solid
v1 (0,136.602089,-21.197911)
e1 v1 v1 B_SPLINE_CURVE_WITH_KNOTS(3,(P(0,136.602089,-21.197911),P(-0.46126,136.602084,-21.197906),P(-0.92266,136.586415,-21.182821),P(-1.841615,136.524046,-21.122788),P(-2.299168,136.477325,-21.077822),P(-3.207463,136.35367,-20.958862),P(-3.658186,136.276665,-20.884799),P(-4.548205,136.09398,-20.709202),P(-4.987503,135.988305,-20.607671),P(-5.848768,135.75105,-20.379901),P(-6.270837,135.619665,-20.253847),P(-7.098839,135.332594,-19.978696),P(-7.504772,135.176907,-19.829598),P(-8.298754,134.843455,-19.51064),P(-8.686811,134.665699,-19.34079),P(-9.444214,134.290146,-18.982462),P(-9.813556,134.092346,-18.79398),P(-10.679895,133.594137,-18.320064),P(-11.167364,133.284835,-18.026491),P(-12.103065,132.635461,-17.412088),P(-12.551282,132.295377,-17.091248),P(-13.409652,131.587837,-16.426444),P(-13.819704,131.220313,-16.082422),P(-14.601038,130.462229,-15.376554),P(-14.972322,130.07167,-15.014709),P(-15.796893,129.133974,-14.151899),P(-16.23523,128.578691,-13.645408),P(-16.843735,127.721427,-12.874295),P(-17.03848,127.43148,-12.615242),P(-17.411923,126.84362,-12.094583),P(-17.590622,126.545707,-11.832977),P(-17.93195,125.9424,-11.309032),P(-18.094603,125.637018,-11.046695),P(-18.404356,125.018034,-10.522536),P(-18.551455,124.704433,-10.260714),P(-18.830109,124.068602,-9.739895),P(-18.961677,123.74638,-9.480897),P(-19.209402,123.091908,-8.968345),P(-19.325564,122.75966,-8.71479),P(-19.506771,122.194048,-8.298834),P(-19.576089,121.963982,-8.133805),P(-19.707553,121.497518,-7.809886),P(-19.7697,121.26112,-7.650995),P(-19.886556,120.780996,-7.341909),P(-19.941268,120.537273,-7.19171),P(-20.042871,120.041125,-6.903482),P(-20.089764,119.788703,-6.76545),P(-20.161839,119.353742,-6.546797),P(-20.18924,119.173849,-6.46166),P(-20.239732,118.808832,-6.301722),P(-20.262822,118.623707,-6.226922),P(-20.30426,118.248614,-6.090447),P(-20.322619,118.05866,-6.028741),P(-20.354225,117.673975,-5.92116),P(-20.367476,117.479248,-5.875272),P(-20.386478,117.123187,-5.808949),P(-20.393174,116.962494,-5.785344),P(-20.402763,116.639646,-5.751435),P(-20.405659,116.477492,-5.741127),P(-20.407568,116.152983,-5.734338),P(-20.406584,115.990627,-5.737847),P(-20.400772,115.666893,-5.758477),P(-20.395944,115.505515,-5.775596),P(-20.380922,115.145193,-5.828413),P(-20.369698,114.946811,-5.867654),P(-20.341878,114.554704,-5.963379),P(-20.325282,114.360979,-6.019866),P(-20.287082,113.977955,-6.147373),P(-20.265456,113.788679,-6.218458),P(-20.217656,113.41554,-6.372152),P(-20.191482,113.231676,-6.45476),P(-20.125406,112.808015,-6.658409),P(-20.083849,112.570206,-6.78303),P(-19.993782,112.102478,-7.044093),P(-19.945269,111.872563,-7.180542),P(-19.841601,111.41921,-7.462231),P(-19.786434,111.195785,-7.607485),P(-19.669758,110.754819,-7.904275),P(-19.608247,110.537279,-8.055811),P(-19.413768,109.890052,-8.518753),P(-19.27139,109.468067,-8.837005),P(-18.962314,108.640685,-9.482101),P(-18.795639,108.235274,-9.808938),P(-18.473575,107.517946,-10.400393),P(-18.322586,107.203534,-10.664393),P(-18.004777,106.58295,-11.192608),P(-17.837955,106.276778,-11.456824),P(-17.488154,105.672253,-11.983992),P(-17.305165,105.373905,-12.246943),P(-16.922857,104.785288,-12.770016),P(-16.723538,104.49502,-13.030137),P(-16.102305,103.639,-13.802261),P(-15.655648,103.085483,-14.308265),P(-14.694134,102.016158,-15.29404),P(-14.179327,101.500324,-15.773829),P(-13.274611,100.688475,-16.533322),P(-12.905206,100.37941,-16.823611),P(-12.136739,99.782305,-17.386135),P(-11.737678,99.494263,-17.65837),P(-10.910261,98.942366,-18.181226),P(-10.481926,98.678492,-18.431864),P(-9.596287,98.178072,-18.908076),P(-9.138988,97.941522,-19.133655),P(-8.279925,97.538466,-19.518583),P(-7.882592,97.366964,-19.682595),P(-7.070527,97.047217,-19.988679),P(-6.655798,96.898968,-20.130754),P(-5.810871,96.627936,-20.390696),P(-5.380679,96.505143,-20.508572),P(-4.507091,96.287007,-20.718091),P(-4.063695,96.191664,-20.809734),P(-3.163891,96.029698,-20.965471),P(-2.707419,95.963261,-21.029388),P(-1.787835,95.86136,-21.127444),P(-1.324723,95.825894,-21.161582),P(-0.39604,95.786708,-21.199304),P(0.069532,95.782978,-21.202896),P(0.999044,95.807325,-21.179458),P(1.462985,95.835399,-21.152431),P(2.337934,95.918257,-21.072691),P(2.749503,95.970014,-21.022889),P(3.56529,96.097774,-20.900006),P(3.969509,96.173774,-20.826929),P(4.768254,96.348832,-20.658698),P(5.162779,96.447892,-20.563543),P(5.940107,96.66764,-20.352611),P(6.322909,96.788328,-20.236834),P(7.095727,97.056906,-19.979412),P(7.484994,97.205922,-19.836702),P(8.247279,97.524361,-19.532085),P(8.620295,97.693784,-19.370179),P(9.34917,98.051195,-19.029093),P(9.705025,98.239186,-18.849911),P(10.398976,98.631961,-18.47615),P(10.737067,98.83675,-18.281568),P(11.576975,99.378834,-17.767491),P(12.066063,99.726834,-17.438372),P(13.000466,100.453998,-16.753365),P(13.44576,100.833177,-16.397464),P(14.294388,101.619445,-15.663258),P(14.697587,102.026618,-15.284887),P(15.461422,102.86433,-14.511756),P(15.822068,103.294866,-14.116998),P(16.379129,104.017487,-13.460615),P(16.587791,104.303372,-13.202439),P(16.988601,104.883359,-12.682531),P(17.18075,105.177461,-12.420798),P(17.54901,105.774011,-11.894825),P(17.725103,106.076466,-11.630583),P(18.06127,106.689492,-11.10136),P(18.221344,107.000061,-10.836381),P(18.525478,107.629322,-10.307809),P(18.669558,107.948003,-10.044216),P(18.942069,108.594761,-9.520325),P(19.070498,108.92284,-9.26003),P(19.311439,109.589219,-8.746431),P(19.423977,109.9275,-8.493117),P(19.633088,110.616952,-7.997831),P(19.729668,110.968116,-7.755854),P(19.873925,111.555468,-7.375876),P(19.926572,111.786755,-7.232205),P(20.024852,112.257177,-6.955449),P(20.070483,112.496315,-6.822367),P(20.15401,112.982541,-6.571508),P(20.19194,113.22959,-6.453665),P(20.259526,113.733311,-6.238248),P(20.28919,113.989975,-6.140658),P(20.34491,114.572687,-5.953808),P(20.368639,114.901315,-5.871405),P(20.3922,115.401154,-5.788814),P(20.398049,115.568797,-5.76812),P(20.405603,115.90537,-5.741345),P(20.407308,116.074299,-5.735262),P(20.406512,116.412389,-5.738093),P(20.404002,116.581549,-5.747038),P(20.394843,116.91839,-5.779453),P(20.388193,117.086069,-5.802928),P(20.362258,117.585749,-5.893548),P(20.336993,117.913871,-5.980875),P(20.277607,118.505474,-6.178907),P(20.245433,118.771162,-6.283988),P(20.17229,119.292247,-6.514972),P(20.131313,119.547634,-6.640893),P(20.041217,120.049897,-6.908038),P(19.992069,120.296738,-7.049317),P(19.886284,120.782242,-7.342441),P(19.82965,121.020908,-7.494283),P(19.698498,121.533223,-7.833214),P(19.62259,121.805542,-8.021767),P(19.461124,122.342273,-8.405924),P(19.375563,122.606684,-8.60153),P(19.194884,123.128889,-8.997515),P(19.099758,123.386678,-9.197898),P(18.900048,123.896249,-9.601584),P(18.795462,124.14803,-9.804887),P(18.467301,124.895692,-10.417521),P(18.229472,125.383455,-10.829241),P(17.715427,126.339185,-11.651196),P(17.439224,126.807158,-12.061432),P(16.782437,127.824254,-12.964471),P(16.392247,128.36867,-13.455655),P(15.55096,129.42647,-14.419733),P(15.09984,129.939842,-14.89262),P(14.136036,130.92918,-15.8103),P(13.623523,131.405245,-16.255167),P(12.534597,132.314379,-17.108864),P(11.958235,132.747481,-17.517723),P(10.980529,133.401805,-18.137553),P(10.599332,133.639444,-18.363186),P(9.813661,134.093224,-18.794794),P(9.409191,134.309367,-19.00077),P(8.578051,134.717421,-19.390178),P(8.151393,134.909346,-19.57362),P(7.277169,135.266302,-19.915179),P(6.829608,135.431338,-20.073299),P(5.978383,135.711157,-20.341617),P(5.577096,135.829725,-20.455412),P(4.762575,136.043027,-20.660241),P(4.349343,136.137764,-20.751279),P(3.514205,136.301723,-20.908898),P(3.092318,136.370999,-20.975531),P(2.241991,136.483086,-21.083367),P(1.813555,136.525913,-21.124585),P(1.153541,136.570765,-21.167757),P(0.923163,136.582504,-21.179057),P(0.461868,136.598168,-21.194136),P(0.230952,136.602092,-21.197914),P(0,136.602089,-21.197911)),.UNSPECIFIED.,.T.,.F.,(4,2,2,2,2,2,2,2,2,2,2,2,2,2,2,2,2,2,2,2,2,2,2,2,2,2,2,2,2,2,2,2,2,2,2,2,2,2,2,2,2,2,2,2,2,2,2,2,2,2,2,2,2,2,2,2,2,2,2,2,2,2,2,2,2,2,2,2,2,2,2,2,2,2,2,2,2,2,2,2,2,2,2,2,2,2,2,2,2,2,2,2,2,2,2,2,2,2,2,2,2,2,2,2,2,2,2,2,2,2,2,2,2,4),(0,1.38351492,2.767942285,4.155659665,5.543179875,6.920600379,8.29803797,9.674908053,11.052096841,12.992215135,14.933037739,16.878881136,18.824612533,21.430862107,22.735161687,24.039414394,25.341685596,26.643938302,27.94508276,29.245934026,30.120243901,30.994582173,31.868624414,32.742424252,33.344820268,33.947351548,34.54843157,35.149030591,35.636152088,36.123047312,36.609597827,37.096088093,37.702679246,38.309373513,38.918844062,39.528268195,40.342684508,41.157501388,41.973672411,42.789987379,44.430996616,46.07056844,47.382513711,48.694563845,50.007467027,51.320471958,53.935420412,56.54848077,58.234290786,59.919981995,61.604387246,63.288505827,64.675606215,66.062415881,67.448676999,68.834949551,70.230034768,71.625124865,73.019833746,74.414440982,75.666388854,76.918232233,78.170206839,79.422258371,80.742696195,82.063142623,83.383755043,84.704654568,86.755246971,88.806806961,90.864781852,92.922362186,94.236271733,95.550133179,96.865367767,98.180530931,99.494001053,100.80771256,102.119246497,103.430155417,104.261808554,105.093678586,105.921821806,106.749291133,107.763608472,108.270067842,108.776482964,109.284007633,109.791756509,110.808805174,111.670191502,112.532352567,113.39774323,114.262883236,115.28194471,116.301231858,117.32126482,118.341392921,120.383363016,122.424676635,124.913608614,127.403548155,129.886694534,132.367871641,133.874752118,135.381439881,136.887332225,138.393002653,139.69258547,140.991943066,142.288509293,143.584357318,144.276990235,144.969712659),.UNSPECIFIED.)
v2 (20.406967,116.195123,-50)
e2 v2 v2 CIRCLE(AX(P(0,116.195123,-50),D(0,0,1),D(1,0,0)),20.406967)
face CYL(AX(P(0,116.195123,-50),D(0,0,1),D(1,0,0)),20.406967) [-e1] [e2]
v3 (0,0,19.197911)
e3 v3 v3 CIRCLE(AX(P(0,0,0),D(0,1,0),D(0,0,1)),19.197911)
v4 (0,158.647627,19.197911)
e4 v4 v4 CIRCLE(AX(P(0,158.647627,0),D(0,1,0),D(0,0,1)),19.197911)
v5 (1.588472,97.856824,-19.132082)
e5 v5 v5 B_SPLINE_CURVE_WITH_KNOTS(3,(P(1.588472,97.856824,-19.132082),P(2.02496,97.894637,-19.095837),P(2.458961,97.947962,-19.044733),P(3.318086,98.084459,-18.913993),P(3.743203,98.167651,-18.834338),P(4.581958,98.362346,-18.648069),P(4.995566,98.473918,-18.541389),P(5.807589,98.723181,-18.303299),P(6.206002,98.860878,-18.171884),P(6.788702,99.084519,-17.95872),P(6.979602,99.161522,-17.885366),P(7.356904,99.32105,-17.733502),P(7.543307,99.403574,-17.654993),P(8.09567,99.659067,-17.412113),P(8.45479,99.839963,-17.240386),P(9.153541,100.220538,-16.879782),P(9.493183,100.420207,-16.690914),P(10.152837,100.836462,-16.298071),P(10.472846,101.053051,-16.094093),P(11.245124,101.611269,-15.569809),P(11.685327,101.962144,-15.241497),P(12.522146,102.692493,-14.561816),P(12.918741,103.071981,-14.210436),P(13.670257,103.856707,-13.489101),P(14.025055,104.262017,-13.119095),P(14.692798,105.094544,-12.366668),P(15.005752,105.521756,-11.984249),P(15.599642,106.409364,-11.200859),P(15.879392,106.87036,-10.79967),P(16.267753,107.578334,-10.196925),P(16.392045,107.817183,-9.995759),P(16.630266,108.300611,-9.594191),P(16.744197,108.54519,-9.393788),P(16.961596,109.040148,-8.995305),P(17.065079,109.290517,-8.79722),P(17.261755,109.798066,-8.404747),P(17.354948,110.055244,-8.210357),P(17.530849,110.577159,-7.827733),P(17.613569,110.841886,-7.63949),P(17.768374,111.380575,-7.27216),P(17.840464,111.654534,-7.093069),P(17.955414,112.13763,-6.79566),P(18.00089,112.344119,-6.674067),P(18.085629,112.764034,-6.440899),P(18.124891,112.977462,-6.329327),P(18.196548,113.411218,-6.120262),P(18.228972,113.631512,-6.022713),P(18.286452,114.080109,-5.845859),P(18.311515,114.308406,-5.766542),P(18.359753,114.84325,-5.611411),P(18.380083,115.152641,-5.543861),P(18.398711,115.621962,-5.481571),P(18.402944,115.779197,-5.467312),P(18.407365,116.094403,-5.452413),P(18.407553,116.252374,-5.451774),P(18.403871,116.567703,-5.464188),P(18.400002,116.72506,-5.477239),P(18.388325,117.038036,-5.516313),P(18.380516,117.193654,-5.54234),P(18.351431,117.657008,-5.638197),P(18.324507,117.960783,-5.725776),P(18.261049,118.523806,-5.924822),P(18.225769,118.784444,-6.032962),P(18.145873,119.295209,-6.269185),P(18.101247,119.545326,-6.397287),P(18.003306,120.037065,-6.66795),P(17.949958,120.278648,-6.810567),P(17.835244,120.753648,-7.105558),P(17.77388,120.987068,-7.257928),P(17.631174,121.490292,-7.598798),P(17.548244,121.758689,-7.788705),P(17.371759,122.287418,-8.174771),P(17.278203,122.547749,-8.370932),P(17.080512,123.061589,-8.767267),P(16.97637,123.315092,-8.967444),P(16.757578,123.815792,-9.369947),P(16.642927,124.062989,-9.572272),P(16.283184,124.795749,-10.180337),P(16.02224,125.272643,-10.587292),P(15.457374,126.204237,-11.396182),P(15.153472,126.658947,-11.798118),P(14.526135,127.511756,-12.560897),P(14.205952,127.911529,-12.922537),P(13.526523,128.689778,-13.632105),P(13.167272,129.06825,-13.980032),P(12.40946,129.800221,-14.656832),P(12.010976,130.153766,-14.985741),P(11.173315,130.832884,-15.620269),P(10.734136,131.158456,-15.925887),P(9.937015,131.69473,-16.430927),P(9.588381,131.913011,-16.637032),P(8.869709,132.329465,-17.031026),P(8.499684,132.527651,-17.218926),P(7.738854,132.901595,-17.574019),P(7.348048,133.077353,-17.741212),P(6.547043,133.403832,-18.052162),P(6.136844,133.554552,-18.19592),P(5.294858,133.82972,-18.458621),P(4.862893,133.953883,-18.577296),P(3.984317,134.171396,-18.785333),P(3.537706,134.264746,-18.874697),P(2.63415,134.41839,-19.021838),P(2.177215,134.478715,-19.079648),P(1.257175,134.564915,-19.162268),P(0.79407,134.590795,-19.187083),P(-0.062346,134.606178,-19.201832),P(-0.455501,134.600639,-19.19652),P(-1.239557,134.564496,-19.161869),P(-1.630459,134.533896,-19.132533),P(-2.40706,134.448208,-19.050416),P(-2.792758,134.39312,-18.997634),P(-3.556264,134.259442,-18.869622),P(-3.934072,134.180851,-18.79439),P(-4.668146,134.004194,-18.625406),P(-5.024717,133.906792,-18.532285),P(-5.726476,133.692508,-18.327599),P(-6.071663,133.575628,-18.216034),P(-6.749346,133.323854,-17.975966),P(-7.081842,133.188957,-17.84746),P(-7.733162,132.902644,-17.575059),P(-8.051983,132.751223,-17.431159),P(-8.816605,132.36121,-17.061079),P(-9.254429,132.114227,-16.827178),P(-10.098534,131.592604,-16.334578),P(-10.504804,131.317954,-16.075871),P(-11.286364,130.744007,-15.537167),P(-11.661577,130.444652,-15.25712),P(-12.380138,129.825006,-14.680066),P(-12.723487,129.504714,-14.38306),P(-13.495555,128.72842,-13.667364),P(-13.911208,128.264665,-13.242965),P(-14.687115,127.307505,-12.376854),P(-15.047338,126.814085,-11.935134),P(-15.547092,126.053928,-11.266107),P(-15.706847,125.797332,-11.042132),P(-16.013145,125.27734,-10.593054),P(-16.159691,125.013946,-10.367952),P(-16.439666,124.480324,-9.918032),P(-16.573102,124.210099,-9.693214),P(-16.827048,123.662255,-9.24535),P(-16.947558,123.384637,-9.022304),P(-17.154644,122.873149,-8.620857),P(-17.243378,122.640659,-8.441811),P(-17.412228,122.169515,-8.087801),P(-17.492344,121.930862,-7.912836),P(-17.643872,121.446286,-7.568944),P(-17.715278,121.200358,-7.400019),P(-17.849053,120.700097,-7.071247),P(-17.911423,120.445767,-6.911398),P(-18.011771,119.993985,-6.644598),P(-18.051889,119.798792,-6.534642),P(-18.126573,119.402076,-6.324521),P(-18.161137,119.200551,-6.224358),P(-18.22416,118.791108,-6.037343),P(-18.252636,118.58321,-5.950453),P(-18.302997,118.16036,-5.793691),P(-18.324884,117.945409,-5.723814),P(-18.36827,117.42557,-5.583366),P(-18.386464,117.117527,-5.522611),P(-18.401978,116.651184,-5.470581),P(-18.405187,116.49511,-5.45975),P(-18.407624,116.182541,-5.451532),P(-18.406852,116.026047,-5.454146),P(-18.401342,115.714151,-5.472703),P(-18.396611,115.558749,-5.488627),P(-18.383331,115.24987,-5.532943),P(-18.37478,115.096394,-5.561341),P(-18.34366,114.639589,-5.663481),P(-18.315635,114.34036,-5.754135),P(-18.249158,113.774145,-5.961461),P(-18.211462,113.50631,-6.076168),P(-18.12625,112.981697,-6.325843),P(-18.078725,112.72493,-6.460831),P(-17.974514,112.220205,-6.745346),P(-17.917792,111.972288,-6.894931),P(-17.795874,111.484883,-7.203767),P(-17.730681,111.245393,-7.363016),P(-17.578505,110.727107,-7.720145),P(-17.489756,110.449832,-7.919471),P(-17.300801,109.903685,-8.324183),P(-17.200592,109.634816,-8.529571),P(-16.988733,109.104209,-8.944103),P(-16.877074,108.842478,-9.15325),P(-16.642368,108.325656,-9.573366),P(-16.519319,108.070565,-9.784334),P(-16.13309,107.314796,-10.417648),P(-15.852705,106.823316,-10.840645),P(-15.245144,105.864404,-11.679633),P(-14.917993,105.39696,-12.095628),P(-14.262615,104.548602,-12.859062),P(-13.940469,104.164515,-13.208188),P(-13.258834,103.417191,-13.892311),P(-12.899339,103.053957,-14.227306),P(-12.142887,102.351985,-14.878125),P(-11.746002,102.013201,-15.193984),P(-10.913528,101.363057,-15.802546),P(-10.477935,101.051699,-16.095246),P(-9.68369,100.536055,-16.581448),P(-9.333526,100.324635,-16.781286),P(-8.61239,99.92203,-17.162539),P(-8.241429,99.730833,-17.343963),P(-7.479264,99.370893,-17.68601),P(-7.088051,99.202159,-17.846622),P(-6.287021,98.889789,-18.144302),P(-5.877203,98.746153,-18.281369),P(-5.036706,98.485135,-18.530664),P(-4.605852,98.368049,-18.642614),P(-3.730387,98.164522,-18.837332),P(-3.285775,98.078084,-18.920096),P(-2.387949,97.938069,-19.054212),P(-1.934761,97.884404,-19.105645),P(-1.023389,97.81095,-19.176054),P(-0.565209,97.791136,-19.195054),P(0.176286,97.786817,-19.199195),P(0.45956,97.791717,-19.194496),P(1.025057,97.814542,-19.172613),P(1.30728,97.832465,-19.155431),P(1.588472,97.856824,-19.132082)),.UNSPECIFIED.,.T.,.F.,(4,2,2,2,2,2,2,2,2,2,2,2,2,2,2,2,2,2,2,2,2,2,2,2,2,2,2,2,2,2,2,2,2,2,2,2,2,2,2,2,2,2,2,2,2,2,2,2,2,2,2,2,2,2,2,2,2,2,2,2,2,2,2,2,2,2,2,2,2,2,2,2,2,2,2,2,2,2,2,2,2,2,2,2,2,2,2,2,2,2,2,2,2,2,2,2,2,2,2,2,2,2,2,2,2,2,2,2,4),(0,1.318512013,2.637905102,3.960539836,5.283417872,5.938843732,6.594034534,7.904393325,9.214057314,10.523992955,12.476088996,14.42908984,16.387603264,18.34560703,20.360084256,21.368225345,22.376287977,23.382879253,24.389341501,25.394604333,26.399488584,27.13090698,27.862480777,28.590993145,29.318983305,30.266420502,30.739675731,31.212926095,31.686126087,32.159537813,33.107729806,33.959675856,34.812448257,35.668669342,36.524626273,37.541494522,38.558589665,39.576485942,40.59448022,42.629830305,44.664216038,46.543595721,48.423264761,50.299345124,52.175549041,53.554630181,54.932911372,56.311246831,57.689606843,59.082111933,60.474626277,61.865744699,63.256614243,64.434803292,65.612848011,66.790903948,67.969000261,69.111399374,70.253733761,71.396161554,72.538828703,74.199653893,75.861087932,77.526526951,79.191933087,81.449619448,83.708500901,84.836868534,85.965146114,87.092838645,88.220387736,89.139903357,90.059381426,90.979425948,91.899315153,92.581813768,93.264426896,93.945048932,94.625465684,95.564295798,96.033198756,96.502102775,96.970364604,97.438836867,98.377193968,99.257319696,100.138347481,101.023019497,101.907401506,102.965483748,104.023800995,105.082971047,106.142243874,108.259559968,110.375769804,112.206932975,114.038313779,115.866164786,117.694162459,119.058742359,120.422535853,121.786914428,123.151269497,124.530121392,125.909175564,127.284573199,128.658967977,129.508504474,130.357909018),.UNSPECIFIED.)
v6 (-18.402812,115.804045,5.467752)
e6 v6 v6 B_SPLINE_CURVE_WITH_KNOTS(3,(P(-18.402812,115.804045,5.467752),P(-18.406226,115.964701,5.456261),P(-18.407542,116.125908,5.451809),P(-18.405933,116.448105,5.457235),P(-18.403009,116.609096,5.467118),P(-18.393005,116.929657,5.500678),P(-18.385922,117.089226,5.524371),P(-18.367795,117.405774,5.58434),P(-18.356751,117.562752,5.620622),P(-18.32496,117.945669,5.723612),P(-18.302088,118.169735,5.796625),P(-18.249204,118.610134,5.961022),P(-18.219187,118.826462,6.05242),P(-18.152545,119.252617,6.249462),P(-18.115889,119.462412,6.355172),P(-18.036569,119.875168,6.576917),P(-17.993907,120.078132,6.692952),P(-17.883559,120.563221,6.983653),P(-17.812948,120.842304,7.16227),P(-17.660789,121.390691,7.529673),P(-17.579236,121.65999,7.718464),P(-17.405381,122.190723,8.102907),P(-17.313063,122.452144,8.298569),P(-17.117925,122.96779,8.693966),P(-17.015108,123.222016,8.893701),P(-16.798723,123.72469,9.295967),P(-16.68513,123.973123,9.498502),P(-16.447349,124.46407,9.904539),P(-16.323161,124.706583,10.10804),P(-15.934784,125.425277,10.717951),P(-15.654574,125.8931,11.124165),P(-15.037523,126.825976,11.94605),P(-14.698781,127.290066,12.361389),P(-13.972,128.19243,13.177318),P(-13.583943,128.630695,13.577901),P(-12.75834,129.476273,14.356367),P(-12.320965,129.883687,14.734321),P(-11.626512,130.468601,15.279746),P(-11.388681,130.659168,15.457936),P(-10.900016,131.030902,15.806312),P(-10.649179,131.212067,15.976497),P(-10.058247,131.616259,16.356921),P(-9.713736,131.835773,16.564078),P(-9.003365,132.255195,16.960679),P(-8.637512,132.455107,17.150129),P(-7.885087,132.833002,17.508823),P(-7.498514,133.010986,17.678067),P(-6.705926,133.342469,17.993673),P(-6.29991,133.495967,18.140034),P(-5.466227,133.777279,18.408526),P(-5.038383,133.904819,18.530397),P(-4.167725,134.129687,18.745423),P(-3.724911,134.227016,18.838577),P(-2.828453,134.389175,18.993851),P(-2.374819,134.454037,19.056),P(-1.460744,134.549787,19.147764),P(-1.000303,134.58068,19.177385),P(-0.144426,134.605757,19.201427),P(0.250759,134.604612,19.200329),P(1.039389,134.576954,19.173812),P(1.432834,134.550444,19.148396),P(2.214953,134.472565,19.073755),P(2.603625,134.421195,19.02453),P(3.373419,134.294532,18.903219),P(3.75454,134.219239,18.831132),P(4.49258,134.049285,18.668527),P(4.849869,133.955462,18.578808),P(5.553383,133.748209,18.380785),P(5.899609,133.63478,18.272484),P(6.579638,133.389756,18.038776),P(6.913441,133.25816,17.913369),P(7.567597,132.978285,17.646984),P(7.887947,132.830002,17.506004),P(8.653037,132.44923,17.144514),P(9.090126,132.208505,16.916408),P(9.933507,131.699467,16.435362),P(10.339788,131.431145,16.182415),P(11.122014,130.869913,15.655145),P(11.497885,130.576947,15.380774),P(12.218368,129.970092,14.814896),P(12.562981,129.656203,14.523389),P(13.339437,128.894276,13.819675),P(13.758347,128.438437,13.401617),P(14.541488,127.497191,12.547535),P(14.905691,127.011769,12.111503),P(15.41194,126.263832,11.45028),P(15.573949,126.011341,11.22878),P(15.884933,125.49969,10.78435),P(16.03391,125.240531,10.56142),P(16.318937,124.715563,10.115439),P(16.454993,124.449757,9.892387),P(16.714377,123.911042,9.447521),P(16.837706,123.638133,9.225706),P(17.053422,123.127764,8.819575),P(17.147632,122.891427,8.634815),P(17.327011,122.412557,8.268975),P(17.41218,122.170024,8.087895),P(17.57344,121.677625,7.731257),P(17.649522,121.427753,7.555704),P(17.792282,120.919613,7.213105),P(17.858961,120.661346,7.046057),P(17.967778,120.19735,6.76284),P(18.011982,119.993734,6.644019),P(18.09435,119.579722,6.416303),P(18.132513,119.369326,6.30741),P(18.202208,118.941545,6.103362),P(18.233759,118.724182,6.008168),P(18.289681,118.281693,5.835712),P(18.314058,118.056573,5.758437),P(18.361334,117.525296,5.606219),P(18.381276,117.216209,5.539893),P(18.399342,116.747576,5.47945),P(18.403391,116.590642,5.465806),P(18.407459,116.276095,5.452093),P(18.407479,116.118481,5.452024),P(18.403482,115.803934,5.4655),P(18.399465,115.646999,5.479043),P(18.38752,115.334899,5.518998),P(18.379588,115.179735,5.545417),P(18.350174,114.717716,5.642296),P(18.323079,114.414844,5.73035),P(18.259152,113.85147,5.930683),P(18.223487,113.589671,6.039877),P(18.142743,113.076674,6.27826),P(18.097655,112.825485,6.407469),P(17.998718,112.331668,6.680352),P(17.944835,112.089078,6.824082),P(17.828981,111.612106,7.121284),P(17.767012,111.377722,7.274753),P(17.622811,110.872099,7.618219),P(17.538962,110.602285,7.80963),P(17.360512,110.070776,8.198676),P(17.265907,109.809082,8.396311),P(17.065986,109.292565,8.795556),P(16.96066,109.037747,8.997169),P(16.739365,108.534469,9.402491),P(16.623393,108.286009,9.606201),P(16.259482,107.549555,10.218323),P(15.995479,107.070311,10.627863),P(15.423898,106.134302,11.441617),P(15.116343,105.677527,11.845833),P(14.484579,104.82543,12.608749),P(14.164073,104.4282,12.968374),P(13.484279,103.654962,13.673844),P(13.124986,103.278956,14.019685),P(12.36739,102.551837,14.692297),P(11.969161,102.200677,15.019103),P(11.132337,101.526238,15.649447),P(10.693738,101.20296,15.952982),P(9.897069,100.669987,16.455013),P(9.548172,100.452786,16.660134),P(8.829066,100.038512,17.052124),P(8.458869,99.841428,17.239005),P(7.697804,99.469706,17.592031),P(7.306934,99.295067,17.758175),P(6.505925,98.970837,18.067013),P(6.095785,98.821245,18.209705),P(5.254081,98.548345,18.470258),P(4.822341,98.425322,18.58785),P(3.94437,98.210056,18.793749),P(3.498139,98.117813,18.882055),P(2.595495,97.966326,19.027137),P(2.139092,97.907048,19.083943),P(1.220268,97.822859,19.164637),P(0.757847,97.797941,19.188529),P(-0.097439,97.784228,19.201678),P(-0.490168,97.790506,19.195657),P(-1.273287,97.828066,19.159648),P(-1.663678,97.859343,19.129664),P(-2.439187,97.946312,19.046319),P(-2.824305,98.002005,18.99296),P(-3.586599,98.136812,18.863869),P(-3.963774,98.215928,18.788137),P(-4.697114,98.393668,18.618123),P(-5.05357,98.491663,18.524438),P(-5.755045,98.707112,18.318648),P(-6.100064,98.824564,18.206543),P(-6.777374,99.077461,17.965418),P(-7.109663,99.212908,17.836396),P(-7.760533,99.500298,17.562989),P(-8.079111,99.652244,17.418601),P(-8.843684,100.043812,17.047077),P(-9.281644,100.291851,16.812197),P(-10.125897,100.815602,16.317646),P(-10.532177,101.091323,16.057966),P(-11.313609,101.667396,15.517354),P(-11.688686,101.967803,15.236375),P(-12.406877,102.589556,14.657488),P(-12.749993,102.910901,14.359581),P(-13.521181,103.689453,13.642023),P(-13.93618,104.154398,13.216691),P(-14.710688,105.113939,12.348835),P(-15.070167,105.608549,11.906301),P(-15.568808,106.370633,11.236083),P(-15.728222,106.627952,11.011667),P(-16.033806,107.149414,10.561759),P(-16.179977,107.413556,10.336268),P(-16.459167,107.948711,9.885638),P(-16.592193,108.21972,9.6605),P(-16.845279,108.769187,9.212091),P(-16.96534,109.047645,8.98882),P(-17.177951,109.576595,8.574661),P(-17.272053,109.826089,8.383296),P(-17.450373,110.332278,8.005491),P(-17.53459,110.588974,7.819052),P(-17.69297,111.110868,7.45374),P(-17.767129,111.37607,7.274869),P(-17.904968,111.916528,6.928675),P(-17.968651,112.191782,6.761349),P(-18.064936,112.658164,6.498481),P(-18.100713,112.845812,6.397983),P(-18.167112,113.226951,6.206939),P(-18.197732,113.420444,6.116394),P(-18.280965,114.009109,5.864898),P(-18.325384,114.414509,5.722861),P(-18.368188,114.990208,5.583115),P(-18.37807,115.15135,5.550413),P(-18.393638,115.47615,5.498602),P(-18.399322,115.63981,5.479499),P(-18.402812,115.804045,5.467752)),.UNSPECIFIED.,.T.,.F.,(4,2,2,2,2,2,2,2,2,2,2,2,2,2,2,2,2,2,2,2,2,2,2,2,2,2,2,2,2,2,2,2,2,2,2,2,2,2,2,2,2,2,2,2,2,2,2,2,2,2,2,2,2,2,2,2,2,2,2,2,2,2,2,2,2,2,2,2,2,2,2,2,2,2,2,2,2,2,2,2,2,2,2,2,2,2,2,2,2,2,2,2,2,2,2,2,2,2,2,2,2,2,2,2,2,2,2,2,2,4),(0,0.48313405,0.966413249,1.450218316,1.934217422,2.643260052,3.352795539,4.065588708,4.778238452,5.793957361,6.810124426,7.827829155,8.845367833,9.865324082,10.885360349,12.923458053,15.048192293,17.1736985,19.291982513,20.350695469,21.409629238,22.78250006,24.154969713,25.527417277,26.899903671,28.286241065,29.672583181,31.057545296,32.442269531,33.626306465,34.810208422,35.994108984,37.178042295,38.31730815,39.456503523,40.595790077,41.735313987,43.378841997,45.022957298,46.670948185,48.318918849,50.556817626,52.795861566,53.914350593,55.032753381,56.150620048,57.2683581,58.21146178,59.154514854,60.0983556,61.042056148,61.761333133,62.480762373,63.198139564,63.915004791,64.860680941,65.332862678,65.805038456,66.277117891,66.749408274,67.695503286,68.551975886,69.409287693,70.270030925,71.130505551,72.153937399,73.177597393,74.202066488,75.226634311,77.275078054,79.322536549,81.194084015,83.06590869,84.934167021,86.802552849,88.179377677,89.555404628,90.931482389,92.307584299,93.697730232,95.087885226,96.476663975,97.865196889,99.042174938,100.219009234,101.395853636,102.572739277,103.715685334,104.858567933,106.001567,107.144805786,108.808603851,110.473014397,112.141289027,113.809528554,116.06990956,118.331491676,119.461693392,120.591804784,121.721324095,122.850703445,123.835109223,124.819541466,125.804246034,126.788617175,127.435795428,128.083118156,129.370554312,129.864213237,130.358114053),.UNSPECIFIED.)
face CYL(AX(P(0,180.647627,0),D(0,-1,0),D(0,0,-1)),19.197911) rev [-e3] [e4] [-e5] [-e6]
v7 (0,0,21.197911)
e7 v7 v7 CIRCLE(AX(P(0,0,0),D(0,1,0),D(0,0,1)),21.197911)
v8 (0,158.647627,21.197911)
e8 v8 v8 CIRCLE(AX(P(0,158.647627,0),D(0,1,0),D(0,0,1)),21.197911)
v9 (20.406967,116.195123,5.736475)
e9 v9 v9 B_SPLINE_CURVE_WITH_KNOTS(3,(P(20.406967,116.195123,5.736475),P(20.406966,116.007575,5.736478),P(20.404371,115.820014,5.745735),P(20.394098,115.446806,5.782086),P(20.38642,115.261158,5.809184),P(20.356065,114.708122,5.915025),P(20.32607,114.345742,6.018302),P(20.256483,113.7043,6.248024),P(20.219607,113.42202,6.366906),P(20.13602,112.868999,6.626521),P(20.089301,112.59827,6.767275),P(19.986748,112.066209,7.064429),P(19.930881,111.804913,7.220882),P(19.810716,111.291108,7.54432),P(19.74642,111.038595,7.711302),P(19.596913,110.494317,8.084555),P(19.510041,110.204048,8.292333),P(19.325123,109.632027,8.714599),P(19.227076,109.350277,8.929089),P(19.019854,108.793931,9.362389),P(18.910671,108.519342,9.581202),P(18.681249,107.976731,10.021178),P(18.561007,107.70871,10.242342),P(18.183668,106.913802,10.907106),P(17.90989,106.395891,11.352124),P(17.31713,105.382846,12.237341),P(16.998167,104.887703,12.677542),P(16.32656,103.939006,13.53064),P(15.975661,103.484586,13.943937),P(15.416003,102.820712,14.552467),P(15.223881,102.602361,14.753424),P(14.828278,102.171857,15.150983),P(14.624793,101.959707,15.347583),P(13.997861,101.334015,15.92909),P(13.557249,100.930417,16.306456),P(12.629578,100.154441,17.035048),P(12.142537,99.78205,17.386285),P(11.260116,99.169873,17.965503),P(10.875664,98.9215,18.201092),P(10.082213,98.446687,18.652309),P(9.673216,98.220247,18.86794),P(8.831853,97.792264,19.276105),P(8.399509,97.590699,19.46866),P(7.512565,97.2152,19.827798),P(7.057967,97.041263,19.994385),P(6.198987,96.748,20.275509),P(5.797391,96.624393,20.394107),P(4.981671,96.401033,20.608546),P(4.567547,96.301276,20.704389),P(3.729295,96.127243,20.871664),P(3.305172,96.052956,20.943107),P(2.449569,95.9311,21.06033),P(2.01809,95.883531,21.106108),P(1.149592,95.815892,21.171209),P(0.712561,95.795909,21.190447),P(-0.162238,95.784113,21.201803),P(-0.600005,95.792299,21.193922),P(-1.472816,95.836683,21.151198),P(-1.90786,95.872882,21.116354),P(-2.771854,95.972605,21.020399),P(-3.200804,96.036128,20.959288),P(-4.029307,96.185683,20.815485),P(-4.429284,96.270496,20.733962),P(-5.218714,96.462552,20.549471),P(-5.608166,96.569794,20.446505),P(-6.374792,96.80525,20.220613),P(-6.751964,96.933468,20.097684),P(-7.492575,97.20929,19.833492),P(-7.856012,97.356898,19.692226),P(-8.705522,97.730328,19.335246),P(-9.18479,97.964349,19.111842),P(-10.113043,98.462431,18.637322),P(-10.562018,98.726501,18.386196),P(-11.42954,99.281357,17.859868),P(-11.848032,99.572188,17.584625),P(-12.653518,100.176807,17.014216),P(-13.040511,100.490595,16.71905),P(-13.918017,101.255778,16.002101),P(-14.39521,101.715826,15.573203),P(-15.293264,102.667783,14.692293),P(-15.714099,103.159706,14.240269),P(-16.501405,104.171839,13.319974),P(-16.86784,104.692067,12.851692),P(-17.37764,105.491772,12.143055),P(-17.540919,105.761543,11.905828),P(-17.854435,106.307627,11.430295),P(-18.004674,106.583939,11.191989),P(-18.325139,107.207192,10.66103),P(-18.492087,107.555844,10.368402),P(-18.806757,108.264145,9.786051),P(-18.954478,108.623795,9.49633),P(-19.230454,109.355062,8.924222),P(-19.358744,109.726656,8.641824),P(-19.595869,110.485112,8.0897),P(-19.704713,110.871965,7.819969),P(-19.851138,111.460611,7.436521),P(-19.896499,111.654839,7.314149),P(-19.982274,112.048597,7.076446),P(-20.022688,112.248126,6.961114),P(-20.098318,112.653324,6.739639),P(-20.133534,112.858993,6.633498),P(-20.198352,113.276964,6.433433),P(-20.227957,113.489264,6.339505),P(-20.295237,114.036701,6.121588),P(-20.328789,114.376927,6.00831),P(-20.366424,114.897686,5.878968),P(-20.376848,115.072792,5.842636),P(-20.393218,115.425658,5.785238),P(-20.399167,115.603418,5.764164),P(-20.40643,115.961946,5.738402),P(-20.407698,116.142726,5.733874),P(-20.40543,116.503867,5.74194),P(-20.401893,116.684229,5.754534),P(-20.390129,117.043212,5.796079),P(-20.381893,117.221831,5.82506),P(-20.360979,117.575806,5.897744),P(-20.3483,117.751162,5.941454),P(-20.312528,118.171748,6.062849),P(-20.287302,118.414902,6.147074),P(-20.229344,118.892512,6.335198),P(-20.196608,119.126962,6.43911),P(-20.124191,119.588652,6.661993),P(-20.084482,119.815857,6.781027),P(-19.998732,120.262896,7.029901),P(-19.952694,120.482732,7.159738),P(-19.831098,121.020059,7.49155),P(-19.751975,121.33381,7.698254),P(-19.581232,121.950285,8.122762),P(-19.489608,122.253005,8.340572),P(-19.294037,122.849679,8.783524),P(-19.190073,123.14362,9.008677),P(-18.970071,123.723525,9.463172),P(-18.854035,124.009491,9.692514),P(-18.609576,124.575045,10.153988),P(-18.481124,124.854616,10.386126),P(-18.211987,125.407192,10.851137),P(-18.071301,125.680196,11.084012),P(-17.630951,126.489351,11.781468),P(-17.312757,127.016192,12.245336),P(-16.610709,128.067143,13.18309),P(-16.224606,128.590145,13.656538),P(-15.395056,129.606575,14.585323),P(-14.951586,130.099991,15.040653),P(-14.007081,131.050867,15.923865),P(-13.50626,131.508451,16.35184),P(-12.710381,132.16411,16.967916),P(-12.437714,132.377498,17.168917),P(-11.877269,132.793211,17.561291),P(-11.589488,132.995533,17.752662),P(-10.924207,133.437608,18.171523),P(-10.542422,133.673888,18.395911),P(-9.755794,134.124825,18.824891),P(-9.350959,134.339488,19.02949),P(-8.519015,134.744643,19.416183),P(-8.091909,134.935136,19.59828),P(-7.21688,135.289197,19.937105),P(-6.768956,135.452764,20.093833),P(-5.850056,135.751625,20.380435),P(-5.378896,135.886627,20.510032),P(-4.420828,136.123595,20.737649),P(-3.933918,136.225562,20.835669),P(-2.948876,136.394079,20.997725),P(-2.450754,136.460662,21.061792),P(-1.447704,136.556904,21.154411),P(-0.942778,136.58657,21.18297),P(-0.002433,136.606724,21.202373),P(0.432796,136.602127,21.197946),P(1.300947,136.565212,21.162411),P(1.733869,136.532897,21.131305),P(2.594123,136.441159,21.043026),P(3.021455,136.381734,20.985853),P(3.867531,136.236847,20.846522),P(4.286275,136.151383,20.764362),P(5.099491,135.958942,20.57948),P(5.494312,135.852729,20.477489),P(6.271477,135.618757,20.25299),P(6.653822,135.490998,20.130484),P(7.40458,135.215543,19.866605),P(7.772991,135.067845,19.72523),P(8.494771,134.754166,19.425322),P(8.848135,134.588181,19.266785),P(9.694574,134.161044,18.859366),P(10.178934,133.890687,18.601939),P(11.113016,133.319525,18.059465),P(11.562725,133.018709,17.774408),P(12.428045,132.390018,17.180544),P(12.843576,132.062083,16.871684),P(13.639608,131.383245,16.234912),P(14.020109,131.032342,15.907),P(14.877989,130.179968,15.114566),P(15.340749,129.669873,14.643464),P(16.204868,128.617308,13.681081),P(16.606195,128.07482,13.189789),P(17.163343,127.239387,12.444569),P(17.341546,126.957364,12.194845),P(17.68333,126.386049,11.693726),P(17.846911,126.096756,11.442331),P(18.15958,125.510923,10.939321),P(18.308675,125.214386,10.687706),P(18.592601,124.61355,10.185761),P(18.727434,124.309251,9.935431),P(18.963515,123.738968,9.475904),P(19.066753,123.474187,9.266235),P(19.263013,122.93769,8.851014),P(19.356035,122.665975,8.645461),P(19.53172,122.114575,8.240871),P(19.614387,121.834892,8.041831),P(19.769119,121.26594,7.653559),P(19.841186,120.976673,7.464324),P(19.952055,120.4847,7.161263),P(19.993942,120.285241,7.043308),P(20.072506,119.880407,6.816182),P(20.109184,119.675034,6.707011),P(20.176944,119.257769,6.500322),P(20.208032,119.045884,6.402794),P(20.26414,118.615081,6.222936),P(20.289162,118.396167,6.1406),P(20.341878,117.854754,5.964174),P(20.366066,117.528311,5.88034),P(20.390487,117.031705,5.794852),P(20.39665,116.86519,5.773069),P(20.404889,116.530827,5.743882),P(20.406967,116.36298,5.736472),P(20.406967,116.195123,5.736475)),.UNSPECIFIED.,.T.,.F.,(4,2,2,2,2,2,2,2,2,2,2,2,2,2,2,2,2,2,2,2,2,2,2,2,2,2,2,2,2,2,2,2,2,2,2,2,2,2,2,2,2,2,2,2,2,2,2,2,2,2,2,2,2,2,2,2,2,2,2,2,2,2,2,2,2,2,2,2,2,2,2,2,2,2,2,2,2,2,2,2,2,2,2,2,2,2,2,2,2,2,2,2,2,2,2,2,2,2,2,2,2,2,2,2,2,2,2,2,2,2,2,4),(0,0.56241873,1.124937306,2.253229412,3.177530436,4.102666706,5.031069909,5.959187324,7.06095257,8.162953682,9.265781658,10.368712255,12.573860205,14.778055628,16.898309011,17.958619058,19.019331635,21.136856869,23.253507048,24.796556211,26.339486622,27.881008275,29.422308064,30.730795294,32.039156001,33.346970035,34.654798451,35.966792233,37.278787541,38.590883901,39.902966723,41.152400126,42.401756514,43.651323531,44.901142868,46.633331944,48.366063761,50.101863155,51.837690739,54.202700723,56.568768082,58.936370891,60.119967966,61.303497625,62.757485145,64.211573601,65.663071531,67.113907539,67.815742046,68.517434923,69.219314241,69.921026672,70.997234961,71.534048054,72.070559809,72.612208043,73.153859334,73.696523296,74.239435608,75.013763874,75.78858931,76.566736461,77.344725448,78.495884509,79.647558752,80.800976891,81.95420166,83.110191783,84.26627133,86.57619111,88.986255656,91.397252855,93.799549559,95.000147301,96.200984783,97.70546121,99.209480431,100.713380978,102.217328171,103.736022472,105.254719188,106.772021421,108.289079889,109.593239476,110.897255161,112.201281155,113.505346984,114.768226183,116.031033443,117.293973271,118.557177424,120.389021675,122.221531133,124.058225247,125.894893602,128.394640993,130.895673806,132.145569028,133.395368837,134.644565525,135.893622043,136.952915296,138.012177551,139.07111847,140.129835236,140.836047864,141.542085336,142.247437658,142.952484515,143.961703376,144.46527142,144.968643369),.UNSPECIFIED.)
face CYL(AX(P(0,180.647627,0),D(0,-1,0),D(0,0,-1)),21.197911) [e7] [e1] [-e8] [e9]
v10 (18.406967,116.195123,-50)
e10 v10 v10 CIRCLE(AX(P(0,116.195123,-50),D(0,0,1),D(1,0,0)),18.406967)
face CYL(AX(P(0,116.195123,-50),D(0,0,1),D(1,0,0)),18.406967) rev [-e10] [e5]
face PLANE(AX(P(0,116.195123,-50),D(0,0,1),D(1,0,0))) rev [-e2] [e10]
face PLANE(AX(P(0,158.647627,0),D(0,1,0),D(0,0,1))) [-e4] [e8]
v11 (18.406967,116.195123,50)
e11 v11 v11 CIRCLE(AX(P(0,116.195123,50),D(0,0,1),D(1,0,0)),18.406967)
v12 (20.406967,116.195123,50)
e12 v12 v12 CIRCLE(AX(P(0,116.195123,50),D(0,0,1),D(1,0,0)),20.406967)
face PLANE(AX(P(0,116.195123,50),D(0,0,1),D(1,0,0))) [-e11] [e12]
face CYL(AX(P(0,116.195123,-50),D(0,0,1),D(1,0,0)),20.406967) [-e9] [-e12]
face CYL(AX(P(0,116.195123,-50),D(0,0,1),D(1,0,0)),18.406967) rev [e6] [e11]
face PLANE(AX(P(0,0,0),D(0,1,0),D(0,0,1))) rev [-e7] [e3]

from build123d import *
from OCP.BRepAlgoAPI import BRepAlgoAPI_Cut
from OCP.TopTools import TopTools_ListOfShape

# Parameters (mm, degrees)
SKETCH7_R           = 21.1979112
BOSS_EXTRUDE1_DEPTH = 180.647627
SKETCH12_R          = 20.406966807
BOSS_EXTRUDE6_DEPTH = 50
SHELL1_START        = -50
SHELL1_OUTLINE_R    = 18.406966807
SHELL1_DEPTH        = 100
SHELL1_2_OUTLINE_R  = 19.1979112
SHELL1_2_DEPTH      = 178.6476265
CUT_EXTRUDE1_START  = -22
SKETCH13_R          = 21.1979112
CUT_EXTRUDE1_DEPTH  = 22


with BuildPart() as part:
    # Sketch7 → Boss-Extrude1 (new body)
    with BuildSketch(Plane(origin=(0, 0, 0), x_dir=(1, 0, 0), z_dir=(0, 1, 0))):
        with Locations(Location((0, 0, 0), (0, 0, 270))):
            Circle(SKETCH7_R)
    extrude(amount=BOSS_EXTRUDE1_DEPTH)

    # Sketch12 → Boss-Extrude6 (add, symmetric)
    with BuildSketch(Plane.XY):
        with Locations((0, 116.195122616)):
            Circle(SKETCH12_R)
    extrude(amount=BOSS_EXTRUDE6_DEPTH, both=True)

    # Shell1: read off the stored shape, not the designer's step
    # Shell1 outline → Shell1 (cut)
    with BuildSketch(Plane.XY.offset(SHELL1_START)):
        with Locations((0, 116.195122616)):
            Circle(SHELL1_OUTLINE_R)
    extrude(amount=SHELL1_DEPTH, mode=Mode.SUBTRACT)

    # Shell1 2 outline → Shell1 2 (cut)
    with BuildSketch(Plane(origin=(0, 0, 0), x_dir=(1, 0, 0), z_dir=(0, 1, 0))):
        Circle(SHELL1_2_OUTLINE_R)
    extrude(amount=SHELL1_2_DEPTH, mode=Mode.SUBTRACT)


with BuildPart() as cut_extrude1_tool:
    # Sketch13 → Cut-Extrude1 (new body)
    with BuildSketch(Plane(origin=(0, 180.6476265, 0), x_dir=(1, 0, 0), z_dir=(0, 1, 0)).offset(CUT_EXTRUDE1_START)):
        with Locations(Location((0, 0, 0), (0, 0, 270))):
            Circle(SKETCH13_R)
    extrude(amount=CUT_EXTRUDE1_DEPTH)


with BuildPart() as part_1:
    add(part.part)

    # Cut-Extrude1: cut by cut_extrude1_tool, with a tolerance
    cut_extrude1_stock = TopTools_ListOfShape()
    cut_extrude1_stock.Append(part_1.part.wrapped)
    cut_extrude1_tools = TopTools_ListOfShape()
    cut_extrude1_tools.Append(cut_extrude1_tool.part.wrapped)
    cut_extrude1_cut = BRepAlgoAPI_Cut()
    cut_extrude1_cut.SetArguments(cut_extrude1_stock)
    cut_extrude1_cut.SetTools(cut_extrude1_tools)
    cut_extrude1_cut.SetFuzzyValue(0.00001)
    cut_extrude1_cut.Build()
    add(Compound.cast(cut_extrude1_cut.Shape()).solids(), mode=Mode.REPLACE)


solid = part_1.part
